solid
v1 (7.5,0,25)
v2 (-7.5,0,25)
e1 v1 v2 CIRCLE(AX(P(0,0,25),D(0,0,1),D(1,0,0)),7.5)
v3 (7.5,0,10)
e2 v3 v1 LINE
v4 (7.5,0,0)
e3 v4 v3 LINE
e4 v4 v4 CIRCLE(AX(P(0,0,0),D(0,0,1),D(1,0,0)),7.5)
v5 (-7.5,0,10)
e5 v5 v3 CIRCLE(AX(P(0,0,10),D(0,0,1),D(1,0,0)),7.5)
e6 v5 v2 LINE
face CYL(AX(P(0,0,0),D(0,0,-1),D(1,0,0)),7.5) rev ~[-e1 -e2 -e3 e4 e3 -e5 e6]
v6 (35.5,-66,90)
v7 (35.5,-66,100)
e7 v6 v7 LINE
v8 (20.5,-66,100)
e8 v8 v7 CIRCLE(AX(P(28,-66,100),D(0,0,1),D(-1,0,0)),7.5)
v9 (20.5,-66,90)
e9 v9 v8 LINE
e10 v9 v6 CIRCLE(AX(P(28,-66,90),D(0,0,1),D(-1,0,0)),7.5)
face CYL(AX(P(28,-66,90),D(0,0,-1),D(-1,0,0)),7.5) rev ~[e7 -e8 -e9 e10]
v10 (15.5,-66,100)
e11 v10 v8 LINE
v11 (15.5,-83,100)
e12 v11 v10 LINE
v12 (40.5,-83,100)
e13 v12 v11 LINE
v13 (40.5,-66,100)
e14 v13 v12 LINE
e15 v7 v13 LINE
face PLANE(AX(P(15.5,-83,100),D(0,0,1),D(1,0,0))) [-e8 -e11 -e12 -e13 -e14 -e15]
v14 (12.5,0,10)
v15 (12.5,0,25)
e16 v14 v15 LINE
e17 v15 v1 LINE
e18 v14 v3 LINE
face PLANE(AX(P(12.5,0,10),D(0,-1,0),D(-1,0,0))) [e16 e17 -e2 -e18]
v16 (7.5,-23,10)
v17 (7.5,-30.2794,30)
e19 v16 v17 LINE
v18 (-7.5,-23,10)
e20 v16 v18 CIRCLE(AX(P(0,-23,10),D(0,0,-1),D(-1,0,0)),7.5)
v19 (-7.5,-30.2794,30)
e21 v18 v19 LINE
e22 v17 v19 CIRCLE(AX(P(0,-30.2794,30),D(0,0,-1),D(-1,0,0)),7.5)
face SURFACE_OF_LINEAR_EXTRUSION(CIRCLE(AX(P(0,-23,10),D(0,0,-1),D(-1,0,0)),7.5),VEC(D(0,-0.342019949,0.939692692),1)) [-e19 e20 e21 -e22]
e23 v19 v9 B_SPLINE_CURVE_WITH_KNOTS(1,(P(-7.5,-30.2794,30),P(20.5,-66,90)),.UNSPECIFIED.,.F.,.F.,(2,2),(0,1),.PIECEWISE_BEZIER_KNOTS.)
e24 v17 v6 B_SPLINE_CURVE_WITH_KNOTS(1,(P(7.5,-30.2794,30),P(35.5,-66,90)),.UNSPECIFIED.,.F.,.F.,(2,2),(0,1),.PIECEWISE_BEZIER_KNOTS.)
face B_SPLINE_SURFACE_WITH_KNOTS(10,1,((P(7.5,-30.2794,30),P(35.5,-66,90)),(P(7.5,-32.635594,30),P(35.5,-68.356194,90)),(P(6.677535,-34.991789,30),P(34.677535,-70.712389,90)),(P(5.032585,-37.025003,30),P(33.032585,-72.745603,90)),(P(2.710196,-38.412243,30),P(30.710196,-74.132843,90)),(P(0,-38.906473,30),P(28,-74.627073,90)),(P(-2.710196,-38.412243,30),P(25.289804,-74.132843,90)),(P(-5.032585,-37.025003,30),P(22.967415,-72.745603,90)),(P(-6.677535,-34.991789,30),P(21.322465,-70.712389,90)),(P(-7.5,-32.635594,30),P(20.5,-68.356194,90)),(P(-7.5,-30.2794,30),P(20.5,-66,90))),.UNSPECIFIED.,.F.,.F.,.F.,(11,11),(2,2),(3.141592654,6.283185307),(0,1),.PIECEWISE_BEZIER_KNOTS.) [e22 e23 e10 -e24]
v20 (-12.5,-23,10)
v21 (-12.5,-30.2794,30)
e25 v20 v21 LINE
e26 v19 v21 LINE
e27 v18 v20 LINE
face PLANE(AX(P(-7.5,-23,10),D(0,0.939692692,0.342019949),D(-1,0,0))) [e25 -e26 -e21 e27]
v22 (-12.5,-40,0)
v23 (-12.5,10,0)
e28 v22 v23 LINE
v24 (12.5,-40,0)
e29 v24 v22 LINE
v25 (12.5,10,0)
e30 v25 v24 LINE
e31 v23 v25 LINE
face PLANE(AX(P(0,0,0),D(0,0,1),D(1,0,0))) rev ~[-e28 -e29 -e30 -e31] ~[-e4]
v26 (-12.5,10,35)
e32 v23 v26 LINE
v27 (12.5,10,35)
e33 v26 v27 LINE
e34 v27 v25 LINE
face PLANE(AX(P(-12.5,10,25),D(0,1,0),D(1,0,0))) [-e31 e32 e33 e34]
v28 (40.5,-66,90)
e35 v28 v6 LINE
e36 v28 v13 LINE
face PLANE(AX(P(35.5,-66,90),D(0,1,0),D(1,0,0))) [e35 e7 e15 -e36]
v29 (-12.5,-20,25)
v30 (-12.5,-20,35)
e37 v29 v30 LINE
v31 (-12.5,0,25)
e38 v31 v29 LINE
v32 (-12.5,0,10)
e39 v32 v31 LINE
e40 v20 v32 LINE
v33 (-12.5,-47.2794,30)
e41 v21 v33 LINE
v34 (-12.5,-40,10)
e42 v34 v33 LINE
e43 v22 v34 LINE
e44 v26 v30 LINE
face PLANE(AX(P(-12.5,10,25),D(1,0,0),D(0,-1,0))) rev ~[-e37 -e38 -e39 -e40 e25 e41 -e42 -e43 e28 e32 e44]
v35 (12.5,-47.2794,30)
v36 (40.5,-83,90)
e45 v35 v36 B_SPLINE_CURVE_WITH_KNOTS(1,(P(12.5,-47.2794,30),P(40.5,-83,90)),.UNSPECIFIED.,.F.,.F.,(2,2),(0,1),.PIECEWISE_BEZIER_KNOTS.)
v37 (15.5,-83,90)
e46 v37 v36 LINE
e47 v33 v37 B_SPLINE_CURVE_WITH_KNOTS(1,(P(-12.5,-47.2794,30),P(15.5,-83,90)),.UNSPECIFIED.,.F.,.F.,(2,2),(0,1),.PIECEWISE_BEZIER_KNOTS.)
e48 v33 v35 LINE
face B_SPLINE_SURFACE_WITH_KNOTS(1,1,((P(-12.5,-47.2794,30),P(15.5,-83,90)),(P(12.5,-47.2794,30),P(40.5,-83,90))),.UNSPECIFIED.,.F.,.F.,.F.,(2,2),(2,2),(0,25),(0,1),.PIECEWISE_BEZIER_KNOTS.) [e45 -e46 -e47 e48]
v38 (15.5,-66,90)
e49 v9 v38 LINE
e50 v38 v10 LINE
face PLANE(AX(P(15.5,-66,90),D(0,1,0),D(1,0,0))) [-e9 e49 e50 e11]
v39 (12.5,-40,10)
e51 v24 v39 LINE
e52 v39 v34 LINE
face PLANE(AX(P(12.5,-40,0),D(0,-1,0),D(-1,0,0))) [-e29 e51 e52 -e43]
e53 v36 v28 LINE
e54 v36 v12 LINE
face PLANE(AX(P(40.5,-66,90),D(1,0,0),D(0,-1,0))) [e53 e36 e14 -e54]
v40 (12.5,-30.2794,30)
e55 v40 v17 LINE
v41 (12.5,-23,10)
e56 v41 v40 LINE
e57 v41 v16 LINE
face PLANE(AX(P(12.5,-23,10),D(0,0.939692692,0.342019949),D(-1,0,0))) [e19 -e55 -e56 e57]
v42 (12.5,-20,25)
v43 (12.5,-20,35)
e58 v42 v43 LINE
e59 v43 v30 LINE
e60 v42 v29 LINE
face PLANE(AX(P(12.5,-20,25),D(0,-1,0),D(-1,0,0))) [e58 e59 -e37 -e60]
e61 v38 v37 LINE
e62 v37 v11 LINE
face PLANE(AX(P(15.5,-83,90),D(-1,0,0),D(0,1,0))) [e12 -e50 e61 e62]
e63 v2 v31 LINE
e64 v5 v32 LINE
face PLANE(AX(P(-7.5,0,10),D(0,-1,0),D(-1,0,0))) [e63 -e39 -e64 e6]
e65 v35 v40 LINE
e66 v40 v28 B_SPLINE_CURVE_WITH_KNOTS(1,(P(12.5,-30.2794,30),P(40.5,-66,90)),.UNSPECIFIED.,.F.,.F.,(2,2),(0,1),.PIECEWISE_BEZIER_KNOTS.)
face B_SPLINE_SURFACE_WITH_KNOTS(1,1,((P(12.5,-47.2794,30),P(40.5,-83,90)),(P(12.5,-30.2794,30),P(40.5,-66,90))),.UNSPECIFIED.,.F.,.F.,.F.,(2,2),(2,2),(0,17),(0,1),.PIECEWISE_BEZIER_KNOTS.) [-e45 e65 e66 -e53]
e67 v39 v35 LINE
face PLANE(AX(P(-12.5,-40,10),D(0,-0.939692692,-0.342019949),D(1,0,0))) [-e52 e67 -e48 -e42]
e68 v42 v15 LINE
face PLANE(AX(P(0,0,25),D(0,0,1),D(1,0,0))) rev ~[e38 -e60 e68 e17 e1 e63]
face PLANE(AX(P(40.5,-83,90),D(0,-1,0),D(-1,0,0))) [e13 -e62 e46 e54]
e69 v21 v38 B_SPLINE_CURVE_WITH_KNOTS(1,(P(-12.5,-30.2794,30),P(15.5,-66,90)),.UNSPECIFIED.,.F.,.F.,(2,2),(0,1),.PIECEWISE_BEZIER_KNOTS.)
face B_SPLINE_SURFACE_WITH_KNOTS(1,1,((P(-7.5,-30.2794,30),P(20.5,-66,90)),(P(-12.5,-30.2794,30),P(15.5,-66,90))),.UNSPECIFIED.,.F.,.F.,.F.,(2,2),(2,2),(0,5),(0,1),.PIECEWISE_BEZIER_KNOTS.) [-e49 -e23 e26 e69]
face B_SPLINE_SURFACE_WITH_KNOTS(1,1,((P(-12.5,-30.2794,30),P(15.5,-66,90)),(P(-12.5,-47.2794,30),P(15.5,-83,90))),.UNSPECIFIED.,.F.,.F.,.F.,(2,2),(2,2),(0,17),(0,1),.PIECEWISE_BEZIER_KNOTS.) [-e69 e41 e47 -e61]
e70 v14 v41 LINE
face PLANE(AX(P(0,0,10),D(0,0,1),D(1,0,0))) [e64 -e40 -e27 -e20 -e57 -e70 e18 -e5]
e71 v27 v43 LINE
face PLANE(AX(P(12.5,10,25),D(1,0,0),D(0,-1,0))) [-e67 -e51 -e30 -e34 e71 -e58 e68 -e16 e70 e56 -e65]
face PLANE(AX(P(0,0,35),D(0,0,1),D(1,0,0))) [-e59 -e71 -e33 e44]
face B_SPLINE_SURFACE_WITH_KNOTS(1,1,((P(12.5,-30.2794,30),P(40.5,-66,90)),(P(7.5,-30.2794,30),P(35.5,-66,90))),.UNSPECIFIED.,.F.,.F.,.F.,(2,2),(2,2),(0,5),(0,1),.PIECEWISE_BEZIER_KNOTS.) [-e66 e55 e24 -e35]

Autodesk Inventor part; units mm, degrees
ref_plane "YZ Plane" through (0, 0, 0) normal (1, 0, 0) x (0, 1, 0)
sketch "Sketch5" plane through (0, 0, 0) normal (0, 0, 1) x (1, 0, 0)
  line L0 (-12.5, 10) -> (12.5, 10)
  line L1 (12.5, 10) -> (12.5, -40)
  line L2 (12.5, -40) -> (-12.5, -40)
  line L3 (-12.5, -40) -> (-12.5, 10)
  circle A0 centre (0, 0) radius 7.5
  dimension "d11" = 25
  dimension "d12" = 50
  dimension "d13" = 15
  dimension "d14" = 10
  dimension "d15" = 12.5
extrude "Extrusion4" add sketch "Sketch5" along normal blind 10
sketch "Sketch6" plane through (0, 0, 10) normal (0, 0, 1) x (1, 0, 0)
  circle A0 centre (0, 0) radius 7.5 projected
  line L0 (-7.5, 0) -> (-12.5, 0)
  line L1 (-12.5, 10) -> (-12.5, -40) projected
  line L2 (-12.5, 10) -> (-12.5, 0)
  line L3 (12.5, 10) -> (-12.5, 10) projected
  line L4 (12.5, -40) -> (12.5, 10) projected
  line L5 (-12.5, 10) -> (12.5, 10)
  line L6 (12.5, 10) -> (12.5, 0)
  line L7 (12.5, 0) -> (7.5, 0)
  arc A1 (7.5, 0) -> (-7.5, 0) centre (0, 0) ccw
extrude "Extrusion5" add sketch "Sketch6" along normal blind 15 contours A0 L0 L1 L3 L4 L7
sketch "Sketch7" plane through (0, 0, 25) normal (0, 0, 1) x (1, 0, 0)
  line L0 (-12.5, 10) -> (-12.5, -40) projected
  line L1 (12.5, -40) -> (12.5, 0) projected
  line L2 (-12.5, 10) -> (12.5, 10)
  line L3 (12.5, 10) -> (12.5, -20)
  line L4 (12.5, -20) -> (-12.5, -20)
  line L5 (-12.5, -20) -> (-12.5, 10)
  point P0 (0, 0)
  point P1 (-12.5, -20)
  point P2 (12.5, 0)
  dimension "d20" = 30
extrude "Extrusion6" add sketch "Sketch7" along normal blind 10
ref_plane "Work Plane1" through (0, -40, 0) normal (1, 0, 0) x (0, 0, -1)
ref_plane "Work Plane2" through (0, 0, 90) normal (0, 0, 1) x (1, 0, 0)
sketch "Sketch12" plane through (0, 0, 90) normal (0, 0, 1) x (1, 0, 0)
  line L0 (0, 28.6) -> (0, -101.6) projected
  line L1 (-23.1, 0) -> (51.1, 0) projected
  arc A0 (20.5, -66) -> (35.5, -66) centre (28, -66) ccw
  line L2 (20.5, -66) -> (15.5, -66)
  line L3 (15.5, -66) -> (15.5, -83)
  line L4 (15.5, -83) -> (40.5, -83)
  line L5 (40.5, -83) -> (40.5, -66)
  line L6 (40.5, -66) -> (35.5, -66)
  point P0 (0, 0)
  dimension "d55" = 15
  dimension "d56" = 5
  dimension "d57" = 17
  dimension "d58" = 25
sketch "Sketch13" plane through (0, 0, 10) normal (0, 0, 1) x (1, 0, 0)
  line L0 (-7.5, -23) -> (-12.5, -23)
  line L1 (-12.5, 0) -> (-12.5, -40) projected
  line L2 (-12.5, -23) -> (-12.5, -40)
  line L3 (-12.5, -40) -> (12.5, -40) projected
  line L4 (-12.5, -40) -> (12.5, -40)
  line L5 (12.5, -40) -> (12.5, -23)
  line L6 (12.5, -40) -> (12.5, 0) projected
  line L7 (12.5, -23) -> (7.5, -23)
  arc A0 (-7.5, -23) -> (7.5, -23) centre (0, -23) ccw
  line L8 (-12.5, -31.5) -> (12.5, -31.5)
  point P0 (0, 0)
  dimension "d48" = 5
  dimension "d49" = 5
  dimension "d50" = 7.5
  dimension "d51" = 17
sketch "Sketch14" plane through (0, 0, 0) normal (1, 0, 0) x (0, 1, 0)
  line L0 (-40, 10) -> (0, 10) projected
  line L1 (-40, 0) -> (-40, 10) projected
  line L2 (-31.5, 10) -> (-38.7794, 30)
  point P0 (0, 0)
  dimension "d62" = 8.5
  dimension "d63" = 70
  dimension "d64" = 20
sweep "Sweep2" add profiles "Sketch13" path "Sketch14" path curves L2
loft "Loft1" add profiles "Sketch12" section 1 edges at (0, -47.2794, 30) (12.5, -38.7794, 30) (10, -30.2794, 30) (0, -37.7794, 30) (-10, -30.2794, 30) (-12.5, -38.7794, 30)
sketch "Sketch15" plane through (15.5, -83, 90) normal (0, 0, 1) x (1, 0, 0)
  line L0 (5, 17) -> (-23, 52.7206) projected
  line L1 (0, 17) -> (5, 17) projected
  line L2 (5, 17) -> (0, 17)
  line L3 (0, 0) -> (0, 17) projected
  line L4 (0, 17) -> (0, 0)
  line L5 (25, 0) -> (0, 0) projected
  line L6 (0, 0) -> (25, 0)
  line L7 (25, 17) -> (25, 0) projected
  line L8 (25, 0) -> (25, 17)
  line L9 (20, 17) -> (25, 17) projected
  line L10 (25, 17) -> (20, 17)
  arc A0 (5, 17) -> (20, 17) centre (12.5, 17) ccw
  point P0 (-15.5, 83)
extrude "Extrusion7" add sketch "Sketch15" along normal blind 10
equation "\"d15\" = 0.5 * d11"
properties part number "ramp(2)"
